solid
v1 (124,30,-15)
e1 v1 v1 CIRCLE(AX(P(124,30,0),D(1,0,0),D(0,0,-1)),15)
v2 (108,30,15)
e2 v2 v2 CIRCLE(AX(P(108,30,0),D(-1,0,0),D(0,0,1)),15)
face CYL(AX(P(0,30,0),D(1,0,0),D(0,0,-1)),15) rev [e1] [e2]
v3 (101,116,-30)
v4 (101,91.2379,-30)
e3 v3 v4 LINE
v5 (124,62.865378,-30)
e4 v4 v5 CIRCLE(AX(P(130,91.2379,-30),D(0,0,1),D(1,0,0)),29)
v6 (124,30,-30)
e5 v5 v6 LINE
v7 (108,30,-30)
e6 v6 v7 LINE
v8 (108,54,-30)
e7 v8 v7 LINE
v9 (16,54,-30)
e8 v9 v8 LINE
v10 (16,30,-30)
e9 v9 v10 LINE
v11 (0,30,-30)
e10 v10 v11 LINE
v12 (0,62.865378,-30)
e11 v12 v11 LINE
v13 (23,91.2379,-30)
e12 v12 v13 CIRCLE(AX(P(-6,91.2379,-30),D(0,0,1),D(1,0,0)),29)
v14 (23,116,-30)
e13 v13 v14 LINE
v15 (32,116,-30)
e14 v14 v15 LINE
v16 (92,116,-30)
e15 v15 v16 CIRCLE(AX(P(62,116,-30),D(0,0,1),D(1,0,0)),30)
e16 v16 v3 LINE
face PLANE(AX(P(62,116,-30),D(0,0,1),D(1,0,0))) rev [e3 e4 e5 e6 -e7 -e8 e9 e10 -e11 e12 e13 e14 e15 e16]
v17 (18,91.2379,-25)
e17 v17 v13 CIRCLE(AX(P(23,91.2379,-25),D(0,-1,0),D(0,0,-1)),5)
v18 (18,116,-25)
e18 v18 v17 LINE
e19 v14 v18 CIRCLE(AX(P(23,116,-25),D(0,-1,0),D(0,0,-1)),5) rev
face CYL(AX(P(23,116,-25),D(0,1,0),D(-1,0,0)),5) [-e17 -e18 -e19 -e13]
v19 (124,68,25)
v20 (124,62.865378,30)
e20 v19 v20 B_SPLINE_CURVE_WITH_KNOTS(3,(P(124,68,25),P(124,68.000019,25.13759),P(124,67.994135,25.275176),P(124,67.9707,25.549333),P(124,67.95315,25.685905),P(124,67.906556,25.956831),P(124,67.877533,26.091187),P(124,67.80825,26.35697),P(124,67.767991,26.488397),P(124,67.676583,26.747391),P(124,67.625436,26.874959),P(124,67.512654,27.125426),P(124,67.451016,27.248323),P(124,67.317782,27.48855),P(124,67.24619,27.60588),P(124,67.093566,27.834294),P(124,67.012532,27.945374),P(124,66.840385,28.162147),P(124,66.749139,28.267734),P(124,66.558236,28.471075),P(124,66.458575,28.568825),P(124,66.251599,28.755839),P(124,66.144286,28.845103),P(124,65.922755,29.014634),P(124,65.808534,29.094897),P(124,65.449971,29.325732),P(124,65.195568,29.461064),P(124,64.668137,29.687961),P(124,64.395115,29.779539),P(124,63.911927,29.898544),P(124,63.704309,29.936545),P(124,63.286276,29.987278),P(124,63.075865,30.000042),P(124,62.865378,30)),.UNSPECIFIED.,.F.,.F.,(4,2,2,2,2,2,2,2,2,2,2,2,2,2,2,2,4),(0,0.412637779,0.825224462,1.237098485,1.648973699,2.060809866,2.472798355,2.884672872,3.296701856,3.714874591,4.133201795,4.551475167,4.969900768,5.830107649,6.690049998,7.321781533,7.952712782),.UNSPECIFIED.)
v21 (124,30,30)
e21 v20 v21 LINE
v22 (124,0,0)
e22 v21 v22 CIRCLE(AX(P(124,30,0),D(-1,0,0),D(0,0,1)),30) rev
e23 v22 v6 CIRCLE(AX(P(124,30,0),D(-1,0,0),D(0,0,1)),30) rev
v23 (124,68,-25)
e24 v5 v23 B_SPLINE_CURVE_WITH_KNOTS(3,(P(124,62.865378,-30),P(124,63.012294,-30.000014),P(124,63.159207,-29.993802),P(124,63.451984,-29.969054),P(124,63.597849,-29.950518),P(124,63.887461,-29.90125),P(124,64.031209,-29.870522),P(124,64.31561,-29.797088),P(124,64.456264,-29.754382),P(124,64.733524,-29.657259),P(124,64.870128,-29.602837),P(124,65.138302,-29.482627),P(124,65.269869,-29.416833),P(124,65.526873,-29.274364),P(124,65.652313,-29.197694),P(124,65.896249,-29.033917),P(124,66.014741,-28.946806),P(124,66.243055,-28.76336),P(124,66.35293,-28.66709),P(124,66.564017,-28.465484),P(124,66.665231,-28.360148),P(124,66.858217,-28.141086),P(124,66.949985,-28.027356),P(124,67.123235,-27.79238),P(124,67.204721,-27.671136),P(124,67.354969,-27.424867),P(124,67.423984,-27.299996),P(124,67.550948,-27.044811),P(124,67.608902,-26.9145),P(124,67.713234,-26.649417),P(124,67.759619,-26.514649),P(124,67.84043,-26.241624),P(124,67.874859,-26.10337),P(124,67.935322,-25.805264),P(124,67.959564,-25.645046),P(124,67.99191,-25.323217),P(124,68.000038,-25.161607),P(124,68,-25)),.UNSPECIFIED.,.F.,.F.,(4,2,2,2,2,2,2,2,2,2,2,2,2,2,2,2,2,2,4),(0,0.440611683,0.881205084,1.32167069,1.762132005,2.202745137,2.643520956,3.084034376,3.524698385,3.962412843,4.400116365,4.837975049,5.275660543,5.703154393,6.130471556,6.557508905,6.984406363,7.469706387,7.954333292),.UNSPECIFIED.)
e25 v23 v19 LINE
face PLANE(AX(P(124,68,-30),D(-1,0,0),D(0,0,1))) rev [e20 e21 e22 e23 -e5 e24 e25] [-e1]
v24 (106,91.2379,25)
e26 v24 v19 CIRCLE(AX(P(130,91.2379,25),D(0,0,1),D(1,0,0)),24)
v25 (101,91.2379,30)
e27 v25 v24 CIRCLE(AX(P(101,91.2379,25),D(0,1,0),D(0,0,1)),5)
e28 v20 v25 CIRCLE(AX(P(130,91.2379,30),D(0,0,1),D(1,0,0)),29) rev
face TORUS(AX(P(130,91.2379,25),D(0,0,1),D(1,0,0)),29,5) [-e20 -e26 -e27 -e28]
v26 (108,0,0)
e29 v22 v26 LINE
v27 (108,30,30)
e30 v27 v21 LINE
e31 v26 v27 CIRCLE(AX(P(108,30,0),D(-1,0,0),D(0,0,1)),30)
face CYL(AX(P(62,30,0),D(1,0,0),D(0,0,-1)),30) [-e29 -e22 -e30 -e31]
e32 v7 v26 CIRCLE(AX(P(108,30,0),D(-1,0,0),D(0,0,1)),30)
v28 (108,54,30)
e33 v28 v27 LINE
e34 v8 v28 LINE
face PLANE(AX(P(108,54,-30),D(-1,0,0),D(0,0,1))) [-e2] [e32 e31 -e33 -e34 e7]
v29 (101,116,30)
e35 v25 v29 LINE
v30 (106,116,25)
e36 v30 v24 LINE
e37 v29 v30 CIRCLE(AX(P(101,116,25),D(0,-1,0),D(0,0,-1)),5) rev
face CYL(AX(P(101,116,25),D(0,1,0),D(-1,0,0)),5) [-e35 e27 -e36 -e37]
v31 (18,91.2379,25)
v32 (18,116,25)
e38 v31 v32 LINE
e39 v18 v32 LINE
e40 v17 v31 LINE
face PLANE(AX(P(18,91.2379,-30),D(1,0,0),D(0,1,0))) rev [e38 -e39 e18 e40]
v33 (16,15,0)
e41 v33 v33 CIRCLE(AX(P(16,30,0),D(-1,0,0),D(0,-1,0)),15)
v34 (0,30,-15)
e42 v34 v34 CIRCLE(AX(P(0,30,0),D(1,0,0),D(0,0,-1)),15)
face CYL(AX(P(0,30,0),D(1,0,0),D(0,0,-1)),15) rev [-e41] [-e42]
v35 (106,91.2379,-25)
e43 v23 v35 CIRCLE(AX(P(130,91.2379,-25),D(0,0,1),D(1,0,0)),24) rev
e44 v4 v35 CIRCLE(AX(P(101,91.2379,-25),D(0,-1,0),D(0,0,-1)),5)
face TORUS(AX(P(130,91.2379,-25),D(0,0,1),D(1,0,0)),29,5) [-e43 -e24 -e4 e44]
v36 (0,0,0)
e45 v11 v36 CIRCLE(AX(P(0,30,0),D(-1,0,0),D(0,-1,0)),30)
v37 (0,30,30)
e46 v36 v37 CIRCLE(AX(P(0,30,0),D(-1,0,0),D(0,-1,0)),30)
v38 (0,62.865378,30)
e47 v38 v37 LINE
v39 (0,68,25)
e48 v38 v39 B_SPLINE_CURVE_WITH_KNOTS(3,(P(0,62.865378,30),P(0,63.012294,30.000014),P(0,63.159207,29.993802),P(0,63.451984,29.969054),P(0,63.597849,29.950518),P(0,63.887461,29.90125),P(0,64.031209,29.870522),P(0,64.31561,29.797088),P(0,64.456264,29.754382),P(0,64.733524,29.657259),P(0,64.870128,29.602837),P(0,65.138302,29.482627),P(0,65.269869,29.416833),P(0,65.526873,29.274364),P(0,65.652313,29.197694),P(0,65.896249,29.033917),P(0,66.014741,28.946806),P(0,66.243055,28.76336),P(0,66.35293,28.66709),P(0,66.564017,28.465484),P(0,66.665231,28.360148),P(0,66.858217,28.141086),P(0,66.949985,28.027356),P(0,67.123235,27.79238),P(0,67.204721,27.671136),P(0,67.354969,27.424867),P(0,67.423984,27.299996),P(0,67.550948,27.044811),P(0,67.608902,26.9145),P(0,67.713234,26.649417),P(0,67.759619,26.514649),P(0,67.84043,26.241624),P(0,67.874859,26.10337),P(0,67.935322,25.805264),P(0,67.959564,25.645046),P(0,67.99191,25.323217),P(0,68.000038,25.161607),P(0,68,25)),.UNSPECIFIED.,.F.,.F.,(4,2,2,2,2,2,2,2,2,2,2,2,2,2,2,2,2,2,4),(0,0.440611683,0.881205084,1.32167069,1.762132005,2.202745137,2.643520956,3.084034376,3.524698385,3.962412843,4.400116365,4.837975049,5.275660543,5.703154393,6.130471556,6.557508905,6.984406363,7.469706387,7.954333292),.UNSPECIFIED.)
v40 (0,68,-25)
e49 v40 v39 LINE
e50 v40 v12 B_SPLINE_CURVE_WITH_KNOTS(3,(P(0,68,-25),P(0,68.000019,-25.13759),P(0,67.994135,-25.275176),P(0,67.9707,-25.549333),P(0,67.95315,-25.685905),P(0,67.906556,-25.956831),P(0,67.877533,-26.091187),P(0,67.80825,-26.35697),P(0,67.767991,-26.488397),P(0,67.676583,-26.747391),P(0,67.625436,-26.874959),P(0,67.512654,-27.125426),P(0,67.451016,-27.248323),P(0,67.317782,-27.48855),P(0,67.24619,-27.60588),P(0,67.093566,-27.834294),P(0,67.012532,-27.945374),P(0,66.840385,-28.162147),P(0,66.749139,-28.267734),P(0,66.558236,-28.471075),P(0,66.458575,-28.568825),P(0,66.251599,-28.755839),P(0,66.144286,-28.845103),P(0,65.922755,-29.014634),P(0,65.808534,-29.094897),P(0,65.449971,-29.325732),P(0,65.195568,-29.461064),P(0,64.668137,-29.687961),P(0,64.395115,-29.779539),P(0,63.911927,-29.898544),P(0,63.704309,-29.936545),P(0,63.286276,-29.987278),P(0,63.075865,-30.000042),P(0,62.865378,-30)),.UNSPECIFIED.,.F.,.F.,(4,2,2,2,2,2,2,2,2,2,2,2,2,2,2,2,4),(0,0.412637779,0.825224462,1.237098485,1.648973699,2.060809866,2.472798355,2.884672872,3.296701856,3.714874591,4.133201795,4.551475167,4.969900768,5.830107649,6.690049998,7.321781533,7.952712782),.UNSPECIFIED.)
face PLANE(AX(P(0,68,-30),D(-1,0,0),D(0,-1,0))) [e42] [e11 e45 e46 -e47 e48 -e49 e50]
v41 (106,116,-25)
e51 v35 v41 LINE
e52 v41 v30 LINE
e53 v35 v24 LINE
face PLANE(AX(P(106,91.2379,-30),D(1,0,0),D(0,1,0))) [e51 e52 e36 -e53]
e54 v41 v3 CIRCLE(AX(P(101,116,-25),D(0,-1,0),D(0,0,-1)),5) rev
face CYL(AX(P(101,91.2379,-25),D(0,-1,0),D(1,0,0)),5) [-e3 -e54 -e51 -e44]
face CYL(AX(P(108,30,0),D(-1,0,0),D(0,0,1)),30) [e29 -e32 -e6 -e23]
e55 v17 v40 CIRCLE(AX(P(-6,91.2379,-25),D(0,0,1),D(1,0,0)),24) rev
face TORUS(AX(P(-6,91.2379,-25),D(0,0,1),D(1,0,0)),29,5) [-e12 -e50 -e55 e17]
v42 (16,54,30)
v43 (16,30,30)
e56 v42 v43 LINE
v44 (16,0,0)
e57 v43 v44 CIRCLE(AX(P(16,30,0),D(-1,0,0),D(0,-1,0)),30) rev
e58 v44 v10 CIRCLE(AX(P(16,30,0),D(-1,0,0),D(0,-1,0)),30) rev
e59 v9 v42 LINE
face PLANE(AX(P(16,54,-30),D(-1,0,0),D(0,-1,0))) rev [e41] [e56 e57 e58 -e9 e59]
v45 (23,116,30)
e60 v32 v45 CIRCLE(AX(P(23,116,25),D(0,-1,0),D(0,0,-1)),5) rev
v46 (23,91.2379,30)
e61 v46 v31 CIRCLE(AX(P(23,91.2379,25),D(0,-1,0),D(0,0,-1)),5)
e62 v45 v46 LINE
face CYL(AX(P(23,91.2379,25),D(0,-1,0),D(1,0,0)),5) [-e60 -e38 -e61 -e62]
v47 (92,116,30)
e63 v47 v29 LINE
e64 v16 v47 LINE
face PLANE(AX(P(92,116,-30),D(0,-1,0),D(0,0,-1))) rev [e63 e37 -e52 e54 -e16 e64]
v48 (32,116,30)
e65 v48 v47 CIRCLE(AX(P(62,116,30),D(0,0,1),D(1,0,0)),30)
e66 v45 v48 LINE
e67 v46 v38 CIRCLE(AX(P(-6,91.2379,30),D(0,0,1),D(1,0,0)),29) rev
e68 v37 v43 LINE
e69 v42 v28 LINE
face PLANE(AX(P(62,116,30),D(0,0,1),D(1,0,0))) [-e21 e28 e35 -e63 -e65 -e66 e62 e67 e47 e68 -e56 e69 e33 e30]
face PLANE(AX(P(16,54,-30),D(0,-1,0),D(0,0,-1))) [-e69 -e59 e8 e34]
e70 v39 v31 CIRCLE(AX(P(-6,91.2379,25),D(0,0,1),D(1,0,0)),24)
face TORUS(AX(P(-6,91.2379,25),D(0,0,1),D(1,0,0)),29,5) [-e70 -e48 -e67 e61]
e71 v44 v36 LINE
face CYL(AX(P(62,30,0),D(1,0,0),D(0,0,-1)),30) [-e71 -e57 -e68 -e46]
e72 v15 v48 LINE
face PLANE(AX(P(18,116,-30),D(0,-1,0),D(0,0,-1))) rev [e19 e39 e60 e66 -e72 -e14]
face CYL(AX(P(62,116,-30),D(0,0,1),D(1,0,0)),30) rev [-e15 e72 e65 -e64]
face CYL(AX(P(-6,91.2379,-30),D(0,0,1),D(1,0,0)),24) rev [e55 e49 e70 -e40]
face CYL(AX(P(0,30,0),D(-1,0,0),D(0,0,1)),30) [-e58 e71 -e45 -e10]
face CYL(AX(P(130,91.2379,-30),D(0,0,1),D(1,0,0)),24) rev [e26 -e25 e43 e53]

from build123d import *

# Parameters (mm, degrees)
BOSS_EXTRUDE1_DEPTH      = 30
BOSS_EXTRUDE1_DEPTH_BACK = 30
FILLET1_R                = 5
SKETCH2_R                = 15
CUT_EXTRUDE1_DEPTH       = 124
FILLET2_R                = 30


with BuildPart() as part:
    # Sketch1 → Boss-Extrude1 (new, two sides: drawn at the far end of the back side and taken through both)
    with BuildSketch(Plane.XY.offset(-BOSS_EXTRUDE1_DEPTH_BACK)):
        with BuildLine():
            Line((108, 0), (124, 0))
            Line((124, 0), (124, 68))
            ThreePointArc((124, 68), (111.026334039, 76.540961621), (106, 91.237900077))
            Line((106, 91.237900077), (106, 116))
            Line((106, 116), (92, 116))
            ThreePointArc((92, 116), (62, 86), (32, 116))
            Line((32, 116), (18, 116))
            Line((18, 116), (18, 91.237900077))
            ThreePointArc((18, 91.237900077), (12.973665961, 76.540961621), (0, 68))
            Line((0, 68), (0, 0))
            Line((0, 0), (16, 0))
            Line((16, 0), (16, 54))
            Line((16, 54), (108, 54))
            Line((108, 54), (108, 0))
        make_face()
    extrude(amount=BOSS_EXTRUDE1_DEPTH + BOSS_EXTRUDE1_DEPTH_BACK)

    # Fillet1
    fillet1_edges = [part.edges().sort_by_distance(p)[0] for p in [
        (106, 103.618950039, -30),
        (111.026334039, 76.540961621, -30),
        (18, 103.618950039, 30),
        (12.973665961, 76.540961621, 30),
        (12.973665961, 76.540961621, -30),
        (111.026334039, 76.540961621, 30),
        (106, 103.618950039, 30),
        (18, 103.618950039, -30),
    ]]
    fillet(fillet1_edges, radius=FILLET1_R)

    # Sketch2 → Cut-Extrude1 (cut)
    with BuildSketch(Plane(origin=(124, 0, 0), x_dir=(0, 0, -1), z_dir=(1, 0, 0))):
        with Locations((0, 30)):
            Circle(SKETCH2_R)
    extrude(amount=-CUT_EXTRUDE1_DEPTH, mode=Mode.SUBTRACT)

    # Fillet2
    fillet2_edges = [part.edges().sort_by_distance(p)[0] for p in [
        (116, 0, -30),
        (116, 0, 30),
        (8, 0, -30),
        (8, 0, 30),
    ]]
    fillet(fillet2_edges, radius=FILLET2_R - 0.0001)  # a hair under: the kernel refuses the full size


solid = part.part
